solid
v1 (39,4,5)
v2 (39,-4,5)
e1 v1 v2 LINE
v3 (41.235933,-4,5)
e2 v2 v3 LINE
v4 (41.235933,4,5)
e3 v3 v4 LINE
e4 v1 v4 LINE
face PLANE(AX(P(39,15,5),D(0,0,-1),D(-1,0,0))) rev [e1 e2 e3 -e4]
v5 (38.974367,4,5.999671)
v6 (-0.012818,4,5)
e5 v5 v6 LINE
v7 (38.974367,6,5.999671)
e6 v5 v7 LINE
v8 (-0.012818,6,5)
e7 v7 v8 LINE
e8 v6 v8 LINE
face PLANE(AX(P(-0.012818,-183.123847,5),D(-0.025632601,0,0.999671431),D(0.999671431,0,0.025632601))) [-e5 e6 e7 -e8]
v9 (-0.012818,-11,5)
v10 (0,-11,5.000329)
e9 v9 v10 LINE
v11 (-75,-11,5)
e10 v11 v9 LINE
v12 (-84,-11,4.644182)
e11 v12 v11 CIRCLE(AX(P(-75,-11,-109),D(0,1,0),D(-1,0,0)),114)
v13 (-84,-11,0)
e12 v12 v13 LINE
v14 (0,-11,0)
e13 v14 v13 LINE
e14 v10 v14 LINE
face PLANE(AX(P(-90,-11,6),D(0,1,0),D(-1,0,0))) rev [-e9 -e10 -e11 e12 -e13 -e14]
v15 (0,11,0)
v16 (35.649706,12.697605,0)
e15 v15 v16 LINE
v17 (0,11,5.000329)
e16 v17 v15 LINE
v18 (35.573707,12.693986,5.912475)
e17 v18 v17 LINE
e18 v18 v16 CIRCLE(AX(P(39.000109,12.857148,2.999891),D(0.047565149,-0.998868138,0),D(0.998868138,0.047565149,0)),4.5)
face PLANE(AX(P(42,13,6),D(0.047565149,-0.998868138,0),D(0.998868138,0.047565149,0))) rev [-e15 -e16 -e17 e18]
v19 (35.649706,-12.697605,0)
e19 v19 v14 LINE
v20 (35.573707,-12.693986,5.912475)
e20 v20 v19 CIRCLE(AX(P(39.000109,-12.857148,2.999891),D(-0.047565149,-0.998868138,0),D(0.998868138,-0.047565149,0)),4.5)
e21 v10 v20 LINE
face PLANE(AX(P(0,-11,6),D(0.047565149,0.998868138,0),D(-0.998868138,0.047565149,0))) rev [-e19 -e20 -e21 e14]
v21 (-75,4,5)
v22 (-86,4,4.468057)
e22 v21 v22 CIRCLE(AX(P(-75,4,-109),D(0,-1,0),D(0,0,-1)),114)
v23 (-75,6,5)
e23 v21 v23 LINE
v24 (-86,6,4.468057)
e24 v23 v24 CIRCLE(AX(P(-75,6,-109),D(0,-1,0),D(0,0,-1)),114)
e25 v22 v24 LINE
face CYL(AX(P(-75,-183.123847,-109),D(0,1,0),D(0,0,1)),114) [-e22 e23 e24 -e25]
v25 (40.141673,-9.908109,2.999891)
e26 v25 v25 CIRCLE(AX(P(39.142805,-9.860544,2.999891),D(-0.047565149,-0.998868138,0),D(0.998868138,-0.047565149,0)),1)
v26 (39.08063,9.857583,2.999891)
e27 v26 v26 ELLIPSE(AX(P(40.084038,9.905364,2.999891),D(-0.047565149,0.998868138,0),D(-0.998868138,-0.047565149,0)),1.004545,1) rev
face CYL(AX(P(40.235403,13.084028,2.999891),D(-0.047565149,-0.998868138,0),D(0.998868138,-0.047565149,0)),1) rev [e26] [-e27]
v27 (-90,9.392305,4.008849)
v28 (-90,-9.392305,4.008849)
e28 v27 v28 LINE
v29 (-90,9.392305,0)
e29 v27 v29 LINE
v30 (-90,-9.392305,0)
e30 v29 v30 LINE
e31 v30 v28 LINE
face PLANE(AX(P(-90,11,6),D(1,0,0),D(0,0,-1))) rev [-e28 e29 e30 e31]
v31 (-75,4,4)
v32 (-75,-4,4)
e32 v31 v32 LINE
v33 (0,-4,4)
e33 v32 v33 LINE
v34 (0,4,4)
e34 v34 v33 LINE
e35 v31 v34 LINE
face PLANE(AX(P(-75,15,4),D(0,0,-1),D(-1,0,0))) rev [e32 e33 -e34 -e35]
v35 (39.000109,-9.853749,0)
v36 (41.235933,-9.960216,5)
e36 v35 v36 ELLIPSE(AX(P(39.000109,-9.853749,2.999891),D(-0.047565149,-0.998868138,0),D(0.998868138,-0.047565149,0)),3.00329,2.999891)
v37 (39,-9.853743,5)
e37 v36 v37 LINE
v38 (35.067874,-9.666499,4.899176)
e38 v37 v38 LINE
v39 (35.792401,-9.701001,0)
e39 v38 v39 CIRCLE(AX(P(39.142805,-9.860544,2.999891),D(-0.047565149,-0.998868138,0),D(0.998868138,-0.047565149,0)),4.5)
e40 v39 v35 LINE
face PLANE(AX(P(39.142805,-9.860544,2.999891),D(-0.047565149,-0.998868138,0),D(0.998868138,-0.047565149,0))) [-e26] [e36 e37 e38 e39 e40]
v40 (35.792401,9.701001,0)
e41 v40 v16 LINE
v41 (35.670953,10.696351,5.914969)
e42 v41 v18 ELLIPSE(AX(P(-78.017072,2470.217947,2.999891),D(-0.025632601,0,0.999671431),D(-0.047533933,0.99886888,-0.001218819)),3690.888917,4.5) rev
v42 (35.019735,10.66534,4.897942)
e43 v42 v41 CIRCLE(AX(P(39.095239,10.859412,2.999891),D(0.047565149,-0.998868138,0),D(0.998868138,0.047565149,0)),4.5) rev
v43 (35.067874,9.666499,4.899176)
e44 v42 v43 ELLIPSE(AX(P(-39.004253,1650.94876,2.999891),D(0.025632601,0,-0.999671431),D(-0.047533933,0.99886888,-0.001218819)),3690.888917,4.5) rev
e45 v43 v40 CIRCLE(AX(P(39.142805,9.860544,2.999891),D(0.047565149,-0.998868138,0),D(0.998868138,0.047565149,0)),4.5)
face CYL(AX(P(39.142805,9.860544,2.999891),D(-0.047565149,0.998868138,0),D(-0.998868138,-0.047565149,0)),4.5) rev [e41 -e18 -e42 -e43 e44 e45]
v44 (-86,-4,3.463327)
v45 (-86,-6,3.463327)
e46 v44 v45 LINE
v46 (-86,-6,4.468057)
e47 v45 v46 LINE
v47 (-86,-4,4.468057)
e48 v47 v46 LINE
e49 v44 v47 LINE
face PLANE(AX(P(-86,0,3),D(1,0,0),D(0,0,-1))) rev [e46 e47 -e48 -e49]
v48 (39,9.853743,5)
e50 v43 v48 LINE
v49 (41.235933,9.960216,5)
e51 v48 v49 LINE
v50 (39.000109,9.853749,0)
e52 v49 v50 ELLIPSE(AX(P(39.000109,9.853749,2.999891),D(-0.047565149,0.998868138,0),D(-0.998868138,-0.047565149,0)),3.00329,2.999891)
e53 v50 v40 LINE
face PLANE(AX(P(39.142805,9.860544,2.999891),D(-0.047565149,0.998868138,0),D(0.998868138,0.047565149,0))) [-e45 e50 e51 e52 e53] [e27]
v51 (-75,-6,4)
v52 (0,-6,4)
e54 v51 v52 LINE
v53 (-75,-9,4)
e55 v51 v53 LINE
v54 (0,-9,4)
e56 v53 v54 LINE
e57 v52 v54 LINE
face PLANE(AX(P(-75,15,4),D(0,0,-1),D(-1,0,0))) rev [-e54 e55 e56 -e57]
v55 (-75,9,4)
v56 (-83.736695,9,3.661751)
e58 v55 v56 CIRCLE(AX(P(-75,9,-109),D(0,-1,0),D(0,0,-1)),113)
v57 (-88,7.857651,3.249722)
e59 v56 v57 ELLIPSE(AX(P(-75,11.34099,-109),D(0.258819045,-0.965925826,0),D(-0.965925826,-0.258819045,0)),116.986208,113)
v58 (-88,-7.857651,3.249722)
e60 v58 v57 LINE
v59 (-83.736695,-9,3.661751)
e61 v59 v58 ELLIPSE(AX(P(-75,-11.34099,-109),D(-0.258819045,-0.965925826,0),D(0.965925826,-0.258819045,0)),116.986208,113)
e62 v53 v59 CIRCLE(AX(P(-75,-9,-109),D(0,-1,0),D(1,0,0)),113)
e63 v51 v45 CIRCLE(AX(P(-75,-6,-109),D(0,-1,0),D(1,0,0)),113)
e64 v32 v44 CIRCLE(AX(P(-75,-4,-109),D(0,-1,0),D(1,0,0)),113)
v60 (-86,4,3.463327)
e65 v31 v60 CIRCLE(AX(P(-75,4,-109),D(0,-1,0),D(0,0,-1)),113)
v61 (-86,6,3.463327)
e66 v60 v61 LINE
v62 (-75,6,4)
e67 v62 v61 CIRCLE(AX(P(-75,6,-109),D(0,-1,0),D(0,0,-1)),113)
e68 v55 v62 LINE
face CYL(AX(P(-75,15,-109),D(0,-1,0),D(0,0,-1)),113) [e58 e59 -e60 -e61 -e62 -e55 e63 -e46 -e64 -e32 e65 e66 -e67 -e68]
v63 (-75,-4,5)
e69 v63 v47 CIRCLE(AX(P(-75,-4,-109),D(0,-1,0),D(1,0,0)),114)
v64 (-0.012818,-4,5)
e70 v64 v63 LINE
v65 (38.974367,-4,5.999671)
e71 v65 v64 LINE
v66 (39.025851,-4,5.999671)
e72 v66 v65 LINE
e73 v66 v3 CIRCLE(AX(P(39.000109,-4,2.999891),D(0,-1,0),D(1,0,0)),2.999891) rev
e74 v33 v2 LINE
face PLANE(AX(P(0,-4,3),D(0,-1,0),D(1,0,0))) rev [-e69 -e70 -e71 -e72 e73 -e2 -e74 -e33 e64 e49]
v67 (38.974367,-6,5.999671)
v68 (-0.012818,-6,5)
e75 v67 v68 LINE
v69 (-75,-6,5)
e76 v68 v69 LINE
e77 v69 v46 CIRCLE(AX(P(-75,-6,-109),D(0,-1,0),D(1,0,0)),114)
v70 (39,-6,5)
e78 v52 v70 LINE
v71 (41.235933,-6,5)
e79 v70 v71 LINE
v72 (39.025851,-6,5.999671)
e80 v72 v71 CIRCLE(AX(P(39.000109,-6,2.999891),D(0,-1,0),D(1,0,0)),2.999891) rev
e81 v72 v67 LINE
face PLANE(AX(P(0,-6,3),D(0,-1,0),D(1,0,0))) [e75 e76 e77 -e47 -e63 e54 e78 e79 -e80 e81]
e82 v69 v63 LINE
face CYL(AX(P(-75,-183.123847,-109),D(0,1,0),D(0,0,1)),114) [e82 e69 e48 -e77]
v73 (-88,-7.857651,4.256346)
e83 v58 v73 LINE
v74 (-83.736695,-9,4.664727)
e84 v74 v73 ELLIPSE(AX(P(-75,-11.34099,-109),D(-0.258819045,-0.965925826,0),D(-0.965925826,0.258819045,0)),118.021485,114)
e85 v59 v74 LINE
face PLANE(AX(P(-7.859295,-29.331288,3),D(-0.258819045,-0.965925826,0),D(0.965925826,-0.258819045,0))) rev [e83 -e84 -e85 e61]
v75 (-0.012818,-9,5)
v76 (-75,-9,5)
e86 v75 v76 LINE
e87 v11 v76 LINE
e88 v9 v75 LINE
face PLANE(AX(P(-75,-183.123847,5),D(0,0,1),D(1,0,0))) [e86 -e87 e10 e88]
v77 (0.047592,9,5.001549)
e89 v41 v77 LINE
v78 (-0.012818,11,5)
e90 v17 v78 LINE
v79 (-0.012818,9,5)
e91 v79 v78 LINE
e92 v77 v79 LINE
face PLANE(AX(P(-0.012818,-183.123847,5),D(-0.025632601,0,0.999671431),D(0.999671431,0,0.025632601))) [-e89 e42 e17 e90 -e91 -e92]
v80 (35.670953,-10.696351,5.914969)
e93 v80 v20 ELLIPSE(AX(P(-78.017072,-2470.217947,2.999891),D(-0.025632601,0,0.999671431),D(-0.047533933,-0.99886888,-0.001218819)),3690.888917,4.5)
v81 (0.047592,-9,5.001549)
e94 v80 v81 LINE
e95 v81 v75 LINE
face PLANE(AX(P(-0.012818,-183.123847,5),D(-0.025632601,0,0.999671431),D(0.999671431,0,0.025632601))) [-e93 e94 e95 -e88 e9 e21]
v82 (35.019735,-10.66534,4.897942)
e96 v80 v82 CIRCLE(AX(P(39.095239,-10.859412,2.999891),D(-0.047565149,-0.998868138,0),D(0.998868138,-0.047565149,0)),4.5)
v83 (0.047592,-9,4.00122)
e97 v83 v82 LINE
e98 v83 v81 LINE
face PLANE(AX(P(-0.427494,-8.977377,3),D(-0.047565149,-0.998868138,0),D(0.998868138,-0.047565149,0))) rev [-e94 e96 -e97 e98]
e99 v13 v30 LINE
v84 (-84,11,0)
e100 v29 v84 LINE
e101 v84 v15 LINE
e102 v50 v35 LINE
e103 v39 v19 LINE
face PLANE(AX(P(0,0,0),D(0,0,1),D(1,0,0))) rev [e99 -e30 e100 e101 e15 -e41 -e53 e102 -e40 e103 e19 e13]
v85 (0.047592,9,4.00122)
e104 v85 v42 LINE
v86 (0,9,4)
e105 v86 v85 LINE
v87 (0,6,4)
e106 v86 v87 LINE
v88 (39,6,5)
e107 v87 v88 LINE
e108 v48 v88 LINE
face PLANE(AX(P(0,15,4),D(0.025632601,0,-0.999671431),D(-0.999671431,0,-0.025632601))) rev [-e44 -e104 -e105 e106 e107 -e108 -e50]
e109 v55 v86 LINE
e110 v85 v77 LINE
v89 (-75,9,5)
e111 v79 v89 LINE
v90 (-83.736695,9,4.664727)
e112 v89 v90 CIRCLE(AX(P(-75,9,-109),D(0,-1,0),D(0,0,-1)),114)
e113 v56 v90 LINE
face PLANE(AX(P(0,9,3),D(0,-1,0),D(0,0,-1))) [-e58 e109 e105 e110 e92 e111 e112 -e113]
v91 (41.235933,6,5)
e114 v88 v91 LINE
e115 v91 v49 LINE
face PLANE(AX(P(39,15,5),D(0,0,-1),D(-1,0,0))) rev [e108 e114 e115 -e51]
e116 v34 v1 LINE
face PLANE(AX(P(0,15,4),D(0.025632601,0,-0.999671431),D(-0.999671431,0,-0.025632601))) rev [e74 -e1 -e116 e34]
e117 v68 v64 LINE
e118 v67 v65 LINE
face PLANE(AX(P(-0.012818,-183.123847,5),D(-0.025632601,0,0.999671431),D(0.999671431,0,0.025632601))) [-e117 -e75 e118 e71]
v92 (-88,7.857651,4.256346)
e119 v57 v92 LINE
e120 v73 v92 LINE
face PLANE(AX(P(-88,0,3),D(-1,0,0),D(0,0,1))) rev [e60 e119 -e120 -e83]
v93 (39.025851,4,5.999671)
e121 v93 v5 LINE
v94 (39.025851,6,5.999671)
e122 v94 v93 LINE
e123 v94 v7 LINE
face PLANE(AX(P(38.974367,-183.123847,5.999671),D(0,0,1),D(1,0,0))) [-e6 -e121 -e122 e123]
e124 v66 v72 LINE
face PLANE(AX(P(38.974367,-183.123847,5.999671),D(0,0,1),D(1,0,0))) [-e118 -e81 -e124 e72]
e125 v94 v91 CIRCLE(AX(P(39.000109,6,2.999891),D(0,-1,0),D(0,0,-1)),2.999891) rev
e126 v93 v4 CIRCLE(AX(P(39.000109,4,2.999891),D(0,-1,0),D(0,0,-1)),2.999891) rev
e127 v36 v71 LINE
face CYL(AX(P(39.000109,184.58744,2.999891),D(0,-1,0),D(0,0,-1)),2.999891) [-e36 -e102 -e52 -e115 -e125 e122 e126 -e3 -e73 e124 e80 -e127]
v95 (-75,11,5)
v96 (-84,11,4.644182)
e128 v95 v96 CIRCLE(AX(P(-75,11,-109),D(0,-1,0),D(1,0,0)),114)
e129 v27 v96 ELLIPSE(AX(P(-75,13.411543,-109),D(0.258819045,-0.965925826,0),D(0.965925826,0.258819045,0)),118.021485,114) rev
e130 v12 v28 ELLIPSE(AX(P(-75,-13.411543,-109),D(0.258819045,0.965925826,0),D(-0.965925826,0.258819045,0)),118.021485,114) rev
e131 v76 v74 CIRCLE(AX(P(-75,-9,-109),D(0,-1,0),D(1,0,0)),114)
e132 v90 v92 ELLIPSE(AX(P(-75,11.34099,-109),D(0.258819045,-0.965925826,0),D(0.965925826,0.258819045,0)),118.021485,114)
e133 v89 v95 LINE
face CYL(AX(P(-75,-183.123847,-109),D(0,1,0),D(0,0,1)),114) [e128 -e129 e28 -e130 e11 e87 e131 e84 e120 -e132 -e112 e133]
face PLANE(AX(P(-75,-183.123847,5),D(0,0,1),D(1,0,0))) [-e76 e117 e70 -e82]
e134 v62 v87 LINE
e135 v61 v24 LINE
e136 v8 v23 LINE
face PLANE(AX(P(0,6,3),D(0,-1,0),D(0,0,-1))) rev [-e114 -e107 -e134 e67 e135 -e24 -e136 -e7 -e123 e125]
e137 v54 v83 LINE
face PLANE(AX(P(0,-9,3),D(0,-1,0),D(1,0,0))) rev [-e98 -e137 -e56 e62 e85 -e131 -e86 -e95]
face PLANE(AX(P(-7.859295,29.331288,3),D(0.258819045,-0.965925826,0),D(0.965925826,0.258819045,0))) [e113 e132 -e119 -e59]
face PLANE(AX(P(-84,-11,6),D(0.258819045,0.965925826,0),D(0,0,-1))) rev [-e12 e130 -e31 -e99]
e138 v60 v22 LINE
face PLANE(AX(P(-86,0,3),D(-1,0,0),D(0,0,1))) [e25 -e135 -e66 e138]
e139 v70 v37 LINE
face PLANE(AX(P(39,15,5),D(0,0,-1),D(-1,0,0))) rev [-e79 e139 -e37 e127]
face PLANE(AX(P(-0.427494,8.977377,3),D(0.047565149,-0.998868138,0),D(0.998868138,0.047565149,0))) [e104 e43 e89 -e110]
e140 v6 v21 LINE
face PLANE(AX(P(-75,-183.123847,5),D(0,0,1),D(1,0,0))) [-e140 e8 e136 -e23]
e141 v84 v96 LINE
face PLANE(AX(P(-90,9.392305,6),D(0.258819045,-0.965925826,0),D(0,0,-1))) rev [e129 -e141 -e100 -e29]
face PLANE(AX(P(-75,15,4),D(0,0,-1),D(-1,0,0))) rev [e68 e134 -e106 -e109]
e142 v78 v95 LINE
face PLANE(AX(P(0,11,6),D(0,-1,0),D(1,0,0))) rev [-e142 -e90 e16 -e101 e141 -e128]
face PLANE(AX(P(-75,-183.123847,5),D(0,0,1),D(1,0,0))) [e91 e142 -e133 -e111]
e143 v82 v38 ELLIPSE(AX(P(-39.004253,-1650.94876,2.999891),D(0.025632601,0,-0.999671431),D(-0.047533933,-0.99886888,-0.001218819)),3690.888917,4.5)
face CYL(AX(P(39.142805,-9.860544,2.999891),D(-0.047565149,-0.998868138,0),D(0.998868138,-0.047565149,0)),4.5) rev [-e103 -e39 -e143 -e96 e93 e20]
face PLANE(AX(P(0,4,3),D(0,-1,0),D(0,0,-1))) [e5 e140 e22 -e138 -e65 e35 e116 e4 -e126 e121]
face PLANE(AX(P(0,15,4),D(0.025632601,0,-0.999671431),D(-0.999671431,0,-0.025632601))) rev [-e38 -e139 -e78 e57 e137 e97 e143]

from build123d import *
from OCP.BRepFilletAPI import BRepFilletAPI_MakeChamfer

# Parameters (mm, degrees)
SALIENTE_EXTRUIR1_DEPTH = 6
CHAFL_N1_SIZE           = 6
CHAFL_N1_SIZE2          = 1.607695155
CORTAR_EXTRUIR1_DEPTH   = 3
SALIENTE_EXTRUIR2_DEPTH = 15
CORTAR_EXTRUIR5_START   = -13
CORTAR_EXTRUIR5_DEPTH   = 26
CORTAR_EXTRUIR6_DEPTH   = 92.438482365
CORTAR_EXTRUIR7_START   = -13
CORTAR_EXTRUIR7_DEPTH   = 26
CROQUIS12_R             = 4.5
CORTAR_EXTRUIR8_DEPTH   = 3
CROQUIS13_R             = 1
CORTAR_EXTRUIR9_DEPTH   = 93.238012844


# Read off the part's stored shape, not the designer's step: Cortar-Extruir5, Cortar-Extruir7
with BuildPart() as part:
    # Croquis1 → Saliente-Extruir1 (new body)
    with BuildSketch(Plane.XY):
        Polygon((0, 11), (-90, 11), (-90, -11), (0, -11), (42, -13), (42, 13), align=None)
    extrude(amount=SALIENTE_EXTRUIR1_DEPTH)

    # Chaflán1: one chamfer whose edges measure the first distance from different faces: ONE call of the kernel's chamfer builder (chamfer() names one face for all edges)
    chafl_n1_edges_1 = [part.edges().sort_by_distance(p)[0] for p in [
        (-90, 11, 3),
    ]]
    chafl_n1_side_1 = [part.faces().sort_by_distance(p)[0] for p in [
        (-45, 11, 3),
    ]]
    chafl_n1_edges_2 = [part.edges().sort_by_distance(p)[0] for p in [
        (-90, -11, 3),
    ]]
    chafl_n1_side_2 = [part.faces().sort_by_distance(p)[0] for p in [
        (-45, -11, 3),
    ]]
    chafl_n1 = BRepFilletAPI_MakeChamfer(part.part.solid().wrapped)
    for e in chafl_n1_edges_1:
        chafl_n1.Add(CHAFL_N1_SIZE, CHAFL_N1_SIZE2, e.wrapped, chafl_n1_side_1[0].wrapped)  # the first distance lies on this face
    for e in chafl_n1_edges_2:
        chafl_n1.Add(CHAFL_N1_SIZE, CHAFL_N1_SIZE2, e.wrapped, chafl_n1_side_2[0].wrapped)  # the first distance lies on this face
    add(Compound.cast(chafl_n1.Shape()), mode=Mode.REPLACE)

    # Croquis7 → Cortar-Extruir1 (cut)
    with BuildSketch(Plane.XY.offset(6)):
        Polygon((-88, 7.857650869), (-88, -7.857650869), (-83.736695005, -9), (0.047592083, -9), (42, -10.99773371), (42, -6), (-86, -6), (-86, -4), (42, -4), (42, 4), (-86, 4), (-86, 6), (42, 6), (42, 10.99773371), (0.047592083, 9), (-83.736695005, 9), align=None)
    extrude(amount=-CORTAR_EXTRUIR1_DEPTH, mode=Mode.SUBTRACT)

    # Croquis3 → Saliente-Extruir2 (add, symmetric)
    with BuildSketch(Plane(origin=(-88, 0, 0), x_dir=(0, 0, 1), z_dir=(0, -1, 0))):
        with BuildLine():
            Line((4, -13), (4, -88))
            Line((4, -88), (5, -127))
            Line((5, -127), (5, -130))
            Line((5, -130), (0, -130))
            Line((0, -130), (0, 2))
            Line((0, 2), (3, 2))
            ThreePointArc((3, 2), (3.129320027, 1.000556782), (3.249721603, 0))
            ThreePointArc((3.249721603, 0), (3.812274468, -6.48918366), (4, -13))
        make_face()
    extrude(amount=SALIENTE_EXTRUIR2_DEPTH, both=True)

    # Cortar-Extruir5 outline → Cortar-Extruir5 (cut)
    with BuildSketch(Plane(origin=(0, 0, 0), x_dir=(1, 0, 0), z_dir=(0, 1, 0)).offset(CORTAR_EXTRUIR5_START)):
        with BuildLine():
            Line((-0.012818406, -5), (-75, -5))
            ThreePointArc((-75, -5), (-80.506427226, -4.866936638), (-86, -4.468057179))
            ThreePointArc((-86, -4.468057179), (-88.002027457, -4.256113663), (-90, -4.008849211))
            Line((-90, -4.008849211), (-90, -6))
            Line((-90, -6), (42, -6))
            Line((42, -6), (42, -5.999671431))
            Line((42, -5.999671431), (38.974367399, -5.999671431))
            Line((38.974367399, -5.999671431), (-0.012818406, -5))
        make_face()
    extrude(amount=CORTAR_EXTRUIR5_DEPTH, mode=Mode.SUBTRACT)

    # Croquis9 → Cortar-Extruir6 (cut, through all)
    with BuildSketch(Plane(origin=(0, 0, 0), x_dir=(-1, 0, 0), z_dir=(0, 0, -1))):
        Polygon((-39, 12.857142857), (0, 11), (75, 11), (84, 11), (90, 9.392304845), (90, 15), (-42, 15), (-42, 13), align=None)
        Polygon((-39, -12.857142857), (-42, -13), (-42, -15), (90, -15), (90, -9.392304845), (84, -11), (75, -11), (0, -11), align=None)
    extrude(amount=-CORTAR_EXTRUIR6_DEPTH, mode=Mode.SUBTRACT)

    # Cortar-Extruir7 outline → Cortar-Extruir7 (cut)
    with BuildSketch(Plane(origin=(0, 0, 0), x_dir=(1, 0, 0), z_dir=(0, 1, 0)).offset(CORTAR_EXTRUIR7_START)):
        with BuildLine():
            Line((42, -5.999671431), (42, -2.999890938))
            ThreePointArc((42, -2.999890938), (41.130433899, -5.112013503), (39.025850725, -5.999671431))
            Line((39.025850725, -5.999671431), (42, -5.999671431))
        make_face()
        with BuildLine():
            ThreePointArc((39.000109062, 0), (41.121352287, -0.878647713), (42, -2.999890938))
            Line((42, -2.999890938), (42, 0))
            Line((42, 0), (39.000109062, 0))
        make_face()
    extrude(amount=CORTAR_EXTRUIR7_DEPTH, mode=Mode.SUBTRACT)

    # Croquis12 → Cortar-Extruir8 (cut)
    with BuildSketch(Plane(origin=(-0.522624434, -10.975113122, 0), x_dir=(0.9988681377244376, -0.04756514941544958, 0), z_dir=(-0.04756514941544957, -0.9988681377244375, 0))):
        with Locations((39.567518478, 2.999890938)):
            Circle(CROQUIS12_R)
    cortar_extruir8 = extrude(amount=-CORTAR_EXTRUIR8_DEPTH, mode=Mode.SUBTRACT)

    # Croquis13 → Cortar-Extruir9 (cut, through all)
    with BuildSketch(Plane(origin=(-0.379928986, -7.978508709, 0), x_dir=(0.9988681377244376, -0.0475651494154496, 0), z_dir=(-0.04756514941544959, -0.9988681377244375, 0))):
        with Locations((39.567518478, 2.999890938)):
            Circle(CROQUIS13_R)
    extrude(amount=-CORTAR_EXTRUIR9_DEPTH, mode=Mode.SUBTRACT)

    # Simetría1: Cortar-Extruir8 across plane
    add(cortar_extruir8.mirror(Plane.ZX), mode=Mode.SUBTRACT)


solid = part.part
